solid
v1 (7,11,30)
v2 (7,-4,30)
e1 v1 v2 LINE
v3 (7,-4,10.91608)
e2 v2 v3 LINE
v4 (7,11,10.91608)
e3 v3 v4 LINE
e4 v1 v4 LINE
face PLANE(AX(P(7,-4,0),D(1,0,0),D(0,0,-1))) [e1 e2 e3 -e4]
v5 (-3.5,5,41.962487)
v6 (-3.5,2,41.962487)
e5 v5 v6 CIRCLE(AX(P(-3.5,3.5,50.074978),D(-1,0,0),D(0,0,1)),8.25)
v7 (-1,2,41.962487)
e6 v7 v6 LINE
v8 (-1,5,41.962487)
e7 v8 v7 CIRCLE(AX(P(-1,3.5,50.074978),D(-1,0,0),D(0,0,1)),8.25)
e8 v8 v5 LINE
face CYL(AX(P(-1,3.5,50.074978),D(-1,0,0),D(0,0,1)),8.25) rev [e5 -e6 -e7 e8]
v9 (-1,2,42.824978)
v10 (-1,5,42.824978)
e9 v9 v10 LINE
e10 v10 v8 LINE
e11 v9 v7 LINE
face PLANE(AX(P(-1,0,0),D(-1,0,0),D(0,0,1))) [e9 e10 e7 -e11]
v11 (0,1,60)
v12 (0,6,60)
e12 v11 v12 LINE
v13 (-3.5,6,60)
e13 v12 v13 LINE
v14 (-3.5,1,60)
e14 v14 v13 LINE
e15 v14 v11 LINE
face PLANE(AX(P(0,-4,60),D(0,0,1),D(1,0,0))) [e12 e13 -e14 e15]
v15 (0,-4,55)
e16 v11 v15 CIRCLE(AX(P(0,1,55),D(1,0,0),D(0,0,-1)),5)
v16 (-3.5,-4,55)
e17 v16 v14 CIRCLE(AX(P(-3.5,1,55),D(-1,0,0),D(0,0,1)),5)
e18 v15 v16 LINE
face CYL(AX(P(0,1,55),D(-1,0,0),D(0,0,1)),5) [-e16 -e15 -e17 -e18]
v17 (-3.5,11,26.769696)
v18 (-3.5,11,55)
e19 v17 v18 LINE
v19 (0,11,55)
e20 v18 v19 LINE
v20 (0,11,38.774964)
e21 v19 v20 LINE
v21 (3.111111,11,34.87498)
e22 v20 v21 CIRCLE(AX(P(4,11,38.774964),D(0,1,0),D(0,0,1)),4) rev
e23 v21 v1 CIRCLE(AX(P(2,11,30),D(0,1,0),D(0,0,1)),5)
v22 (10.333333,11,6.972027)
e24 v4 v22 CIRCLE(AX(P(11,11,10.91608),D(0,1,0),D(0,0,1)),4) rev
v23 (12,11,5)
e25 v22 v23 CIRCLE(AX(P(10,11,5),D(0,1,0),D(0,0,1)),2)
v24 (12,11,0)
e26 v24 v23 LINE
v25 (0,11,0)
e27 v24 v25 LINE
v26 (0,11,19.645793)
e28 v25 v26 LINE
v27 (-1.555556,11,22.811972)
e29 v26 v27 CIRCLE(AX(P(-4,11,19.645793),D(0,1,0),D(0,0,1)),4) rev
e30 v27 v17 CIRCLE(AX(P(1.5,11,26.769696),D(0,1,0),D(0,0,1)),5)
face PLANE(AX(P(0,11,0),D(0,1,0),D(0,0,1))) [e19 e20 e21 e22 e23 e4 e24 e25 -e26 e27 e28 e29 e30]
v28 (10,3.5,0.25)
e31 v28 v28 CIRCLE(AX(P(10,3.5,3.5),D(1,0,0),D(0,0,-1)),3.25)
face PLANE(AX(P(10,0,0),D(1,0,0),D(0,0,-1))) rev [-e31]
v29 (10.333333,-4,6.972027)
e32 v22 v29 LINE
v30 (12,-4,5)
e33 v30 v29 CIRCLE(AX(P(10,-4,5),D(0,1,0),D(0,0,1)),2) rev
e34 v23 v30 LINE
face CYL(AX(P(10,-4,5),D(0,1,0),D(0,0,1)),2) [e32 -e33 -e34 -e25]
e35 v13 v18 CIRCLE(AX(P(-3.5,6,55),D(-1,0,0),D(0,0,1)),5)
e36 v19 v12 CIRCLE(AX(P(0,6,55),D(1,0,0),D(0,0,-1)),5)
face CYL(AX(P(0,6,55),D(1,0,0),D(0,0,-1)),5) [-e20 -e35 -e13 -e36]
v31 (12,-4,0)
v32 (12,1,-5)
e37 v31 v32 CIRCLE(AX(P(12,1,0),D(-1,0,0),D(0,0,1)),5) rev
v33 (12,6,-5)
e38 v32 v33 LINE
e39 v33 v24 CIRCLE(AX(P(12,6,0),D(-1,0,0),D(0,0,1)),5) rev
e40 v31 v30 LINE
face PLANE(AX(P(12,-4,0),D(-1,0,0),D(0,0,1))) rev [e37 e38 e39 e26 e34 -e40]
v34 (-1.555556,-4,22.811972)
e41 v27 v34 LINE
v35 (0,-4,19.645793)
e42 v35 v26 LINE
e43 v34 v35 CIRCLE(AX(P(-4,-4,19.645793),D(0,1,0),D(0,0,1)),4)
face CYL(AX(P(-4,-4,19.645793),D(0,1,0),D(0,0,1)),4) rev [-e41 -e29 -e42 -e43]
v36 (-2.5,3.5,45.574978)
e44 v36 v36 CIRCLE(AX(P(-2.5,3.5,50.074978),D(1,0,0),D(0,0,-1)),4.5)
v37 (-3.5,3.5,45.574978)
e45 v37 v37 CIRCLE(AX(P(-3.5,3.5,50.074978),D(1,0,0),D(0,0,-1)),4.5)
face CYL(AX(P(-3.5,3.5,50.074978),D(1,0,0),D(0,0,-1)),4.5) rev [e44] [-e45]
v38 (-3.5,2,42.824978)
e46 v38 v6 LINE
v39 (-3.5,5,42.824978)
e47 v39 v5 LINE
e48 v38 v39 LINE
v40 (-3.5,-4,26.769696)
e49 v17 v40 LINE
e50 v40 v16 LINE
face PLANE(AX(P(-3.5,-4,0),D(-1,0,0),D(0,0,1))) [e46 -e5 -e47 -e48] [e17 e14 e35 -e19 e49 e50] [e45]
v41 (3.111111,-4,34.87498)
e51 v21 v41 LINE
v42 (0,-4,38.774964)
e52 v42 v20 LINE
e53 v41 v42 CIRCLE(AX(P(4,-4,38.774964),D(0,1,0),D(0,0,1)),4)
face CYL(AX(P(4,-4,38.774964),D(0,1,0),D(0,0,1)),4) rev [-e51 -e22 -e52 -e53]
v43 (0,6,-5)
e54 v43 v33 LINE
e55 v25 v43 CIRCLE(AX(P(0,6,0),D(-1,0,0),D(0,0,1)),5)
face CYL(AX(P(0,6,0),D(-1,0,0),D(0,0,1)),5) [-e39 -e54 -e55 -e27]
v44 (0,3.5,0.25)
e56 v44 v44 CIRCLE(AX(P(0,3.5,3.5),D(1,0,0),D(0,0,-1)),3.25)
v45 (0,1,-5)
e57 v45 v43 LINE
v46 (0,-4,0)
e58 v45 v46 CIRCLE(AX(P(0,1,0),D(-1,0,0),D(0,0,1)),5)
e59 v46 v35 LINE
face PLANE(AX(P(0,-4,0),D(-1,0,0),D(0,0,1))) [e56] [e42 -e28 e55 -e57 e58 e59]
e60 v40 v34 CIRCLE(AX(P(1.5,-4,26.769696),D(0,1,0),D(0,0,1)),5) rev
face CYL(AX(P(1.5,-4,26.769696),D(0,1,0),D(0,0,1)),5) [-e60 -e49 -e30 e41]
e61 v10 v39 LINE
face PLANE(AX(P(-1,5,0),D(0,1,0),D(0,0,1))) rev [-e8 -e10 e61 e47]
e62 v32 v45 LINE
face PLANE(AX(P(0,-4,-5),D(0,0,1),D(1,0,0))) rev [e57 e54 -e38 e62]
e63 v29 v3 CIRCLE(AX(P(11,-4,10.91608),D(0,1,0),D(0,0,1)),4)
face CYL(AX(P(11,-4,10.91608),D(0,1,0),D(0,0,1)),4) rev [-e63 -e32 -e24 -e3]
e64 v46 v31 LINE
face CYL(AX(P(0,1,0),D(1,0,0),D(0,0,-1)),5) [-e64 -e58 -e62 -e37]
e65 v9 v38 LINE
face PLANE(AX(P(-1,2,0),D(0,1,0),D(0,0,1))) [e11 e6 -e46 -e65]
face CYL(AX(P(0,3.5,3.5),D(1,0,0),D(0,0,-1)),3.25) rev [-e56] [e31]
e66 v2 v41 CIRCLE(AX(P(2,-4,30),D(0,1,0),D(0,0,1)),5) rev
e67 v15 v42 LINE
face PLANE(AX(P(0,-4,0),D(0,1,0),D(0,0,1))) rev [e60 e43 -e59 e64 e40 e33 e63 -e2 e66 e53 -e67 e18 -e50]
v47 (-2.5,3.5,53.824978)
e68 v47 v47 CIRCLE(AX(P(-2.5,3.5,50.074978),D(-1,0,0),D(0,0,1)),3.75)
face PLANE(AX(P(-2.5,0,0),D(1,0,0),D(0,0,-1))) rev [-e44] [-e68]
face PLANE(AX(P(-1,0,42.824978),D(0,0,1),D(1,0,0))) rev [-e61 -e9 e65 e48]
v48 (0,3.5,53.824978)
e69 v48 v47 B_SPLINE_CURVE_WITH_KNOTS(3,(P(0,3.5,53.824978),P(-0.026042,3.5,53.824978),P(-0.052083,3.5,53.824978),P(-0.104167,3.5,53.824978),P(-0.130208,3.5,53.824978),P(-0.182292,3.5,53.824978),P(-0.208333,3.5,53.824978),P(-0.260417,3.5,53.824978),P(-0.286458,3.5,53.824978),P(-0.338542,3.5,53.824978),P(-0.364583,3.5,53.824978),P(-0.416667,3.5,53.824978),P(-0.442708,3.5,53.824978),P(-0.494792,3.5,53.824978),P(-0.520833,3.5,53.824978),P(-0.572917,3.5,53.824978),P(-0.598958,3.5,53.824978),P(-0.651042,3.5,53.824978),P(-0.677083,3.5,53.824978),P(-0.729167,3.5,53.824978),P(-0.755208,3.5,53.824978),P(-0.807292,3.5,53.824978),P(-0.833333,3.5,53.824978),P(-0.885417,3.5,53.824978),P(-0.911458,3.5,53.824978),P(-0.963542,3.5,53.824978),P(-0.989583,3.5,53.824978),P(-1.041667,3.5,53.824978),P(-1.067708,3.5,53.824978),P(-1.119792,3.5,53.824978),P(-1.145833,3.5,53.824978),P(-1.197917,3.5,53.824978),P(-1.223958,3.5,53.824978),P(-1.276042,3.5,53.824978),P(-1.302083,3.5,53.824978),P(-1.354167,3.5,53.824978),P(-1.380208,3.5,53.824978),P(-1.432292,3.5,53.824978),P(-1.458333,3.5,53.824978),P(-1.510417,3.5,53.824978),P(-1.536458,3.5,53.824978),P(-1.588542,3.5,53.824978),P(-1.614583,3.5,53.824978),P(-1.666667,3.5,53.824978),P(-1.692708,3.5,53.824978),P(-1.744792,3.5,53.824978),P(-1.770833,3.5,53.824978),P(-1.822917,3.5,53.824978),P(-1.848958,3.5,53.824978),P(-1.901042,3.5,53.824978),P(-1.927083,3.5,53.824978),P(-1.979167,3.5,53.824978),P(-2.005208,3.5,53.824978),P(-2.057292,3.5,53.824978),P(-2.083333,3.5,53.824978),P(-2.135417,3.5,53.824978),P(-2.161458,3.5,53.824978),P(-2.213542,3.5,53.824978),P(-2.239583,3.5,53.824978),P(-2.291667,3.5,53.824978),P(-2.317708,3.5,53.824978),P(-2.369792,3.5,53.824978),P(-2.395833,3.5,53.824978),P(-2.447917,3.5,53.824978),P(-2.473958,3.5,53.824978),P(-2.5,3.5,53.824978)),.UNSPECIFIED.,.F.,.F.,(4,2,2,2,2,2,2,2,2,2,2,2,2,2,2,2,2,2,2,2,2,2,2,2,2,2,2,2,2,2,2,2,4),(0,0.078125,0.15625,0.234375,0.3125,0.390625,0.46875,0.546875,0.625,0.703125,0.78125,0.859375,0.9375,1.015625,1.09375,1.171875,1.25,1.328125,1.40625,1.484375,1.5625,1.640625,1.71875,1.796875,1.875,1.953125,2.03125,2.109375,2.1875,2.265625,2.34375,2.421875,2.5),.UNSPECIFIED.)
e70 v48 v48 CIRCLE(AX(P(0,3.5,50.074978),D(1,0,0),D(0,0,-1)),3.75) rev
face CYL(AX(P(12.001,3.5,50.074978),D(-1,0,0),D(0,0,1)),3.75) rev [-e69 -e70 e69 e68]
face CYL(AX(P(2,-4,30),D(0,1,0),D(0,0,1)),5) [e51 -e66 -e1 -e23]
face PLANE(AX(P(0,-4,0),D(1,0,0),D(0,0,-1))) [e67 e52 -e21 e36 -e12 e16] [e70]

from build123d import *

# Parameters (mm, degrees)
BOSS_EXTRUDE1_DEPTH      = 11
BOSS_EXTRUDE1_DEPTH_BACK = 4
CUT_EXTRUDE1_OUTLINE_R   = 3.25
CUT_EXTRUDE1_DEPTH       = 10
CUT_EXTRUDE3_START       = -3.5
CUT_EXTRUDE3_OUTLINE_R   = 4.5
CUT_EXTRUDE3_DEPTH       = 1
CUT_EXTRUDE4_REACH       = 64.7
SKETCH5_R                = 3.75
CUT_EXTRUDE5_DEPTH       = 2.5
FILLET1_R                = 5
FILLET2_R                = 5
FILLET3_R                = 5
FILLET4_R                = 2
FILLET5_R                = 4
FILLET6_R                = 4


# Read off the part's stored shape, not the designer's step: Cut-Extrude1, Cut-Extrude3
with BuildPart() as part:
    # Sketch2 → Boss-Extrude1 (new, two sides: drawn at the far end of the back side and taken through both)
    with BuildSketch(Plane(origin=(0, 0, 0), x_dir=(1, 0, 0), z_dir=(0, 1, 0)).offset(-BOSS_EXTRUDE1_DEPTH_BACK)):
        Polygon((0, 5), (0, -22), (-3.5, -22), (-3.5, -60), (0, -60), (0, -35), (7, -35), (7, -7), (12, -7), (12, 5), align=None)
    extrude(amount=BOSS_EXTRUDE1_DEPTH + BOSS_EXTRUDE1_DEPTH_BACK)

    # Cut-Extrude1 outline → Cut-Extrude1 (cut)
    with BuildSketch(Plane.YZ):
        with Locations((3.5, 3.5)):
            Circle(CUT_EXTRUDE1_OUTLINE_R)
    extrude(amount=CUT_EXTRUDE1_DEPTH, mode=Mode.SUBTRACT)

    # Cut-Extrude3 outline → Cut-Extrude3 (cut)
    with BuildSketch(Plane.YZ.offset(CUT_EXTRUDE3_START)):
        with Locations((3.5, 50.074977824)):
            Circle(CUT_EXTRUDE3_OUTLINE_R)
    extrude(amount=CUT_EXTRUDE3_DEPTH, mode=Mode.SUBTRACT)

    # Sketch5 → Cut-Extrude4 (cut, up to next)
    with BuildSketch(Plane.ZY.offset(2.5), mode=Mode.PRIVATE) as cut_extrude4_sk1:
        with Locations((50.074977824, 3.5)):
            Circle(SKETCH5_R)
    cut_extrude4_tool1 = extrude(cut_extrude4_sk1.sketch, amount=-CUT_EXTRUDE4_REACH, mode=Mode.PRIVATE) & part.part
    add(cut_extrude4_tool1.solids().sort_by_distance((-2.5, 3.5, 50.074978))[0], mode=Mode.SUBTRACT)

    # Sketch10 → Cut-Extrude5 (cut)
    with BuildSketch(Plane.ZY.offset(3.5)):
        with BuildLine():
            ThreePointArc((41.962487455, 5), (41.859427156, 4.25314489), (41.824977824, 3.5))
            Line((41.824977824, 3.5), (42.824977824, 3.5))
            Line((42.824977824, 3.5), (42.824977824, 5))
            Line((42.824977824, 5), (41.962487455, 5))
        make_face()
        with BuildLine():
            Line((42.824977824, 3.5), (41.824977824, 3.5))
            ThreePointArc((41.824977824, 3.5), (41.859427156, 2.74685511), (41.962487455, 2))
            Line((41.962487455, 2), (42.824977824, 2))
            Line((42.824977824, 2), (42.824977824, 3.5))
        make_face()
    extrude(amount=-CUT_EXTRUDE5_DEPTH, mode=Mode.SUBTRACT)

    # Fillet1
    fillet1_edges = [part.edges().sort_by_distance(p)[0] for p in [
        (6, -4, -5),
        (6, 11, -5),
        (-1.75, -4, 60),
        (-1.75, 11, 60),
    ]]
    fillet(fillet1_edges, radius=FILLET1_R)

    # Fillet2
    # the kernel refuses this fillet: 5 mm, written as the material it takes off along each edge
    with BuildSketch(Plane(origin=(-3.5, -15.924240018, 22), x_dir=(1, 0, 0), z_dir=(0, 1, 0))) as fillet2_piece_1:
        with BuildLine():
            CenterArc((5, -4.769696007), FILLET2_R, 107.457603124, 72.542396876)
            Line((0, -4.769696007), (-0.1, -4.769696007))
            Line((-0.1, -4.769696007), (-0.1, 0))
            Line((-0.1, 0), (0, 0.1))
            ThreePointArc((0, 0.1), (1.75, 0.1), (3.47, 0.09539392))
            Line((3.47, 0.09539392), (3.5, 0))
        make_face()
    extrude(amount=38.848480035, mode=Mode.SUBTRACT)

    # Fillet3
    fillet3_edges = [part.edges().sort_by_distance(p)[0] for p in [
        (7, 3.5, 35),
    ]]
    fillet(fillet3_edges, radius=FILLET3_R)

    # Fillet4
    fillet4_edges = [part.edges().sort_by_distance(p)[0] for p in [
        (12, 3.5, 7),
    ]]
    fillet(fillet4_edges, radius=FILLET4_R)

    # Fillet5
    fillet5_edges = [part.edges().sort_by_distance(p)[0] for p in [
        (7, 3.5, 7),
        (0, 3.5, 35),
    ]]
    fillet(fillet5_edges, radius=FILLET5_R)

    # Fillet6
    fillet6_edges = [part.edges().sort_by_distance(p)[0] for p in [
        (0, 3.5, 22),
    ]]
    fillet(fillet6_edges, radius=FILLET6_R)


solid = part.part
